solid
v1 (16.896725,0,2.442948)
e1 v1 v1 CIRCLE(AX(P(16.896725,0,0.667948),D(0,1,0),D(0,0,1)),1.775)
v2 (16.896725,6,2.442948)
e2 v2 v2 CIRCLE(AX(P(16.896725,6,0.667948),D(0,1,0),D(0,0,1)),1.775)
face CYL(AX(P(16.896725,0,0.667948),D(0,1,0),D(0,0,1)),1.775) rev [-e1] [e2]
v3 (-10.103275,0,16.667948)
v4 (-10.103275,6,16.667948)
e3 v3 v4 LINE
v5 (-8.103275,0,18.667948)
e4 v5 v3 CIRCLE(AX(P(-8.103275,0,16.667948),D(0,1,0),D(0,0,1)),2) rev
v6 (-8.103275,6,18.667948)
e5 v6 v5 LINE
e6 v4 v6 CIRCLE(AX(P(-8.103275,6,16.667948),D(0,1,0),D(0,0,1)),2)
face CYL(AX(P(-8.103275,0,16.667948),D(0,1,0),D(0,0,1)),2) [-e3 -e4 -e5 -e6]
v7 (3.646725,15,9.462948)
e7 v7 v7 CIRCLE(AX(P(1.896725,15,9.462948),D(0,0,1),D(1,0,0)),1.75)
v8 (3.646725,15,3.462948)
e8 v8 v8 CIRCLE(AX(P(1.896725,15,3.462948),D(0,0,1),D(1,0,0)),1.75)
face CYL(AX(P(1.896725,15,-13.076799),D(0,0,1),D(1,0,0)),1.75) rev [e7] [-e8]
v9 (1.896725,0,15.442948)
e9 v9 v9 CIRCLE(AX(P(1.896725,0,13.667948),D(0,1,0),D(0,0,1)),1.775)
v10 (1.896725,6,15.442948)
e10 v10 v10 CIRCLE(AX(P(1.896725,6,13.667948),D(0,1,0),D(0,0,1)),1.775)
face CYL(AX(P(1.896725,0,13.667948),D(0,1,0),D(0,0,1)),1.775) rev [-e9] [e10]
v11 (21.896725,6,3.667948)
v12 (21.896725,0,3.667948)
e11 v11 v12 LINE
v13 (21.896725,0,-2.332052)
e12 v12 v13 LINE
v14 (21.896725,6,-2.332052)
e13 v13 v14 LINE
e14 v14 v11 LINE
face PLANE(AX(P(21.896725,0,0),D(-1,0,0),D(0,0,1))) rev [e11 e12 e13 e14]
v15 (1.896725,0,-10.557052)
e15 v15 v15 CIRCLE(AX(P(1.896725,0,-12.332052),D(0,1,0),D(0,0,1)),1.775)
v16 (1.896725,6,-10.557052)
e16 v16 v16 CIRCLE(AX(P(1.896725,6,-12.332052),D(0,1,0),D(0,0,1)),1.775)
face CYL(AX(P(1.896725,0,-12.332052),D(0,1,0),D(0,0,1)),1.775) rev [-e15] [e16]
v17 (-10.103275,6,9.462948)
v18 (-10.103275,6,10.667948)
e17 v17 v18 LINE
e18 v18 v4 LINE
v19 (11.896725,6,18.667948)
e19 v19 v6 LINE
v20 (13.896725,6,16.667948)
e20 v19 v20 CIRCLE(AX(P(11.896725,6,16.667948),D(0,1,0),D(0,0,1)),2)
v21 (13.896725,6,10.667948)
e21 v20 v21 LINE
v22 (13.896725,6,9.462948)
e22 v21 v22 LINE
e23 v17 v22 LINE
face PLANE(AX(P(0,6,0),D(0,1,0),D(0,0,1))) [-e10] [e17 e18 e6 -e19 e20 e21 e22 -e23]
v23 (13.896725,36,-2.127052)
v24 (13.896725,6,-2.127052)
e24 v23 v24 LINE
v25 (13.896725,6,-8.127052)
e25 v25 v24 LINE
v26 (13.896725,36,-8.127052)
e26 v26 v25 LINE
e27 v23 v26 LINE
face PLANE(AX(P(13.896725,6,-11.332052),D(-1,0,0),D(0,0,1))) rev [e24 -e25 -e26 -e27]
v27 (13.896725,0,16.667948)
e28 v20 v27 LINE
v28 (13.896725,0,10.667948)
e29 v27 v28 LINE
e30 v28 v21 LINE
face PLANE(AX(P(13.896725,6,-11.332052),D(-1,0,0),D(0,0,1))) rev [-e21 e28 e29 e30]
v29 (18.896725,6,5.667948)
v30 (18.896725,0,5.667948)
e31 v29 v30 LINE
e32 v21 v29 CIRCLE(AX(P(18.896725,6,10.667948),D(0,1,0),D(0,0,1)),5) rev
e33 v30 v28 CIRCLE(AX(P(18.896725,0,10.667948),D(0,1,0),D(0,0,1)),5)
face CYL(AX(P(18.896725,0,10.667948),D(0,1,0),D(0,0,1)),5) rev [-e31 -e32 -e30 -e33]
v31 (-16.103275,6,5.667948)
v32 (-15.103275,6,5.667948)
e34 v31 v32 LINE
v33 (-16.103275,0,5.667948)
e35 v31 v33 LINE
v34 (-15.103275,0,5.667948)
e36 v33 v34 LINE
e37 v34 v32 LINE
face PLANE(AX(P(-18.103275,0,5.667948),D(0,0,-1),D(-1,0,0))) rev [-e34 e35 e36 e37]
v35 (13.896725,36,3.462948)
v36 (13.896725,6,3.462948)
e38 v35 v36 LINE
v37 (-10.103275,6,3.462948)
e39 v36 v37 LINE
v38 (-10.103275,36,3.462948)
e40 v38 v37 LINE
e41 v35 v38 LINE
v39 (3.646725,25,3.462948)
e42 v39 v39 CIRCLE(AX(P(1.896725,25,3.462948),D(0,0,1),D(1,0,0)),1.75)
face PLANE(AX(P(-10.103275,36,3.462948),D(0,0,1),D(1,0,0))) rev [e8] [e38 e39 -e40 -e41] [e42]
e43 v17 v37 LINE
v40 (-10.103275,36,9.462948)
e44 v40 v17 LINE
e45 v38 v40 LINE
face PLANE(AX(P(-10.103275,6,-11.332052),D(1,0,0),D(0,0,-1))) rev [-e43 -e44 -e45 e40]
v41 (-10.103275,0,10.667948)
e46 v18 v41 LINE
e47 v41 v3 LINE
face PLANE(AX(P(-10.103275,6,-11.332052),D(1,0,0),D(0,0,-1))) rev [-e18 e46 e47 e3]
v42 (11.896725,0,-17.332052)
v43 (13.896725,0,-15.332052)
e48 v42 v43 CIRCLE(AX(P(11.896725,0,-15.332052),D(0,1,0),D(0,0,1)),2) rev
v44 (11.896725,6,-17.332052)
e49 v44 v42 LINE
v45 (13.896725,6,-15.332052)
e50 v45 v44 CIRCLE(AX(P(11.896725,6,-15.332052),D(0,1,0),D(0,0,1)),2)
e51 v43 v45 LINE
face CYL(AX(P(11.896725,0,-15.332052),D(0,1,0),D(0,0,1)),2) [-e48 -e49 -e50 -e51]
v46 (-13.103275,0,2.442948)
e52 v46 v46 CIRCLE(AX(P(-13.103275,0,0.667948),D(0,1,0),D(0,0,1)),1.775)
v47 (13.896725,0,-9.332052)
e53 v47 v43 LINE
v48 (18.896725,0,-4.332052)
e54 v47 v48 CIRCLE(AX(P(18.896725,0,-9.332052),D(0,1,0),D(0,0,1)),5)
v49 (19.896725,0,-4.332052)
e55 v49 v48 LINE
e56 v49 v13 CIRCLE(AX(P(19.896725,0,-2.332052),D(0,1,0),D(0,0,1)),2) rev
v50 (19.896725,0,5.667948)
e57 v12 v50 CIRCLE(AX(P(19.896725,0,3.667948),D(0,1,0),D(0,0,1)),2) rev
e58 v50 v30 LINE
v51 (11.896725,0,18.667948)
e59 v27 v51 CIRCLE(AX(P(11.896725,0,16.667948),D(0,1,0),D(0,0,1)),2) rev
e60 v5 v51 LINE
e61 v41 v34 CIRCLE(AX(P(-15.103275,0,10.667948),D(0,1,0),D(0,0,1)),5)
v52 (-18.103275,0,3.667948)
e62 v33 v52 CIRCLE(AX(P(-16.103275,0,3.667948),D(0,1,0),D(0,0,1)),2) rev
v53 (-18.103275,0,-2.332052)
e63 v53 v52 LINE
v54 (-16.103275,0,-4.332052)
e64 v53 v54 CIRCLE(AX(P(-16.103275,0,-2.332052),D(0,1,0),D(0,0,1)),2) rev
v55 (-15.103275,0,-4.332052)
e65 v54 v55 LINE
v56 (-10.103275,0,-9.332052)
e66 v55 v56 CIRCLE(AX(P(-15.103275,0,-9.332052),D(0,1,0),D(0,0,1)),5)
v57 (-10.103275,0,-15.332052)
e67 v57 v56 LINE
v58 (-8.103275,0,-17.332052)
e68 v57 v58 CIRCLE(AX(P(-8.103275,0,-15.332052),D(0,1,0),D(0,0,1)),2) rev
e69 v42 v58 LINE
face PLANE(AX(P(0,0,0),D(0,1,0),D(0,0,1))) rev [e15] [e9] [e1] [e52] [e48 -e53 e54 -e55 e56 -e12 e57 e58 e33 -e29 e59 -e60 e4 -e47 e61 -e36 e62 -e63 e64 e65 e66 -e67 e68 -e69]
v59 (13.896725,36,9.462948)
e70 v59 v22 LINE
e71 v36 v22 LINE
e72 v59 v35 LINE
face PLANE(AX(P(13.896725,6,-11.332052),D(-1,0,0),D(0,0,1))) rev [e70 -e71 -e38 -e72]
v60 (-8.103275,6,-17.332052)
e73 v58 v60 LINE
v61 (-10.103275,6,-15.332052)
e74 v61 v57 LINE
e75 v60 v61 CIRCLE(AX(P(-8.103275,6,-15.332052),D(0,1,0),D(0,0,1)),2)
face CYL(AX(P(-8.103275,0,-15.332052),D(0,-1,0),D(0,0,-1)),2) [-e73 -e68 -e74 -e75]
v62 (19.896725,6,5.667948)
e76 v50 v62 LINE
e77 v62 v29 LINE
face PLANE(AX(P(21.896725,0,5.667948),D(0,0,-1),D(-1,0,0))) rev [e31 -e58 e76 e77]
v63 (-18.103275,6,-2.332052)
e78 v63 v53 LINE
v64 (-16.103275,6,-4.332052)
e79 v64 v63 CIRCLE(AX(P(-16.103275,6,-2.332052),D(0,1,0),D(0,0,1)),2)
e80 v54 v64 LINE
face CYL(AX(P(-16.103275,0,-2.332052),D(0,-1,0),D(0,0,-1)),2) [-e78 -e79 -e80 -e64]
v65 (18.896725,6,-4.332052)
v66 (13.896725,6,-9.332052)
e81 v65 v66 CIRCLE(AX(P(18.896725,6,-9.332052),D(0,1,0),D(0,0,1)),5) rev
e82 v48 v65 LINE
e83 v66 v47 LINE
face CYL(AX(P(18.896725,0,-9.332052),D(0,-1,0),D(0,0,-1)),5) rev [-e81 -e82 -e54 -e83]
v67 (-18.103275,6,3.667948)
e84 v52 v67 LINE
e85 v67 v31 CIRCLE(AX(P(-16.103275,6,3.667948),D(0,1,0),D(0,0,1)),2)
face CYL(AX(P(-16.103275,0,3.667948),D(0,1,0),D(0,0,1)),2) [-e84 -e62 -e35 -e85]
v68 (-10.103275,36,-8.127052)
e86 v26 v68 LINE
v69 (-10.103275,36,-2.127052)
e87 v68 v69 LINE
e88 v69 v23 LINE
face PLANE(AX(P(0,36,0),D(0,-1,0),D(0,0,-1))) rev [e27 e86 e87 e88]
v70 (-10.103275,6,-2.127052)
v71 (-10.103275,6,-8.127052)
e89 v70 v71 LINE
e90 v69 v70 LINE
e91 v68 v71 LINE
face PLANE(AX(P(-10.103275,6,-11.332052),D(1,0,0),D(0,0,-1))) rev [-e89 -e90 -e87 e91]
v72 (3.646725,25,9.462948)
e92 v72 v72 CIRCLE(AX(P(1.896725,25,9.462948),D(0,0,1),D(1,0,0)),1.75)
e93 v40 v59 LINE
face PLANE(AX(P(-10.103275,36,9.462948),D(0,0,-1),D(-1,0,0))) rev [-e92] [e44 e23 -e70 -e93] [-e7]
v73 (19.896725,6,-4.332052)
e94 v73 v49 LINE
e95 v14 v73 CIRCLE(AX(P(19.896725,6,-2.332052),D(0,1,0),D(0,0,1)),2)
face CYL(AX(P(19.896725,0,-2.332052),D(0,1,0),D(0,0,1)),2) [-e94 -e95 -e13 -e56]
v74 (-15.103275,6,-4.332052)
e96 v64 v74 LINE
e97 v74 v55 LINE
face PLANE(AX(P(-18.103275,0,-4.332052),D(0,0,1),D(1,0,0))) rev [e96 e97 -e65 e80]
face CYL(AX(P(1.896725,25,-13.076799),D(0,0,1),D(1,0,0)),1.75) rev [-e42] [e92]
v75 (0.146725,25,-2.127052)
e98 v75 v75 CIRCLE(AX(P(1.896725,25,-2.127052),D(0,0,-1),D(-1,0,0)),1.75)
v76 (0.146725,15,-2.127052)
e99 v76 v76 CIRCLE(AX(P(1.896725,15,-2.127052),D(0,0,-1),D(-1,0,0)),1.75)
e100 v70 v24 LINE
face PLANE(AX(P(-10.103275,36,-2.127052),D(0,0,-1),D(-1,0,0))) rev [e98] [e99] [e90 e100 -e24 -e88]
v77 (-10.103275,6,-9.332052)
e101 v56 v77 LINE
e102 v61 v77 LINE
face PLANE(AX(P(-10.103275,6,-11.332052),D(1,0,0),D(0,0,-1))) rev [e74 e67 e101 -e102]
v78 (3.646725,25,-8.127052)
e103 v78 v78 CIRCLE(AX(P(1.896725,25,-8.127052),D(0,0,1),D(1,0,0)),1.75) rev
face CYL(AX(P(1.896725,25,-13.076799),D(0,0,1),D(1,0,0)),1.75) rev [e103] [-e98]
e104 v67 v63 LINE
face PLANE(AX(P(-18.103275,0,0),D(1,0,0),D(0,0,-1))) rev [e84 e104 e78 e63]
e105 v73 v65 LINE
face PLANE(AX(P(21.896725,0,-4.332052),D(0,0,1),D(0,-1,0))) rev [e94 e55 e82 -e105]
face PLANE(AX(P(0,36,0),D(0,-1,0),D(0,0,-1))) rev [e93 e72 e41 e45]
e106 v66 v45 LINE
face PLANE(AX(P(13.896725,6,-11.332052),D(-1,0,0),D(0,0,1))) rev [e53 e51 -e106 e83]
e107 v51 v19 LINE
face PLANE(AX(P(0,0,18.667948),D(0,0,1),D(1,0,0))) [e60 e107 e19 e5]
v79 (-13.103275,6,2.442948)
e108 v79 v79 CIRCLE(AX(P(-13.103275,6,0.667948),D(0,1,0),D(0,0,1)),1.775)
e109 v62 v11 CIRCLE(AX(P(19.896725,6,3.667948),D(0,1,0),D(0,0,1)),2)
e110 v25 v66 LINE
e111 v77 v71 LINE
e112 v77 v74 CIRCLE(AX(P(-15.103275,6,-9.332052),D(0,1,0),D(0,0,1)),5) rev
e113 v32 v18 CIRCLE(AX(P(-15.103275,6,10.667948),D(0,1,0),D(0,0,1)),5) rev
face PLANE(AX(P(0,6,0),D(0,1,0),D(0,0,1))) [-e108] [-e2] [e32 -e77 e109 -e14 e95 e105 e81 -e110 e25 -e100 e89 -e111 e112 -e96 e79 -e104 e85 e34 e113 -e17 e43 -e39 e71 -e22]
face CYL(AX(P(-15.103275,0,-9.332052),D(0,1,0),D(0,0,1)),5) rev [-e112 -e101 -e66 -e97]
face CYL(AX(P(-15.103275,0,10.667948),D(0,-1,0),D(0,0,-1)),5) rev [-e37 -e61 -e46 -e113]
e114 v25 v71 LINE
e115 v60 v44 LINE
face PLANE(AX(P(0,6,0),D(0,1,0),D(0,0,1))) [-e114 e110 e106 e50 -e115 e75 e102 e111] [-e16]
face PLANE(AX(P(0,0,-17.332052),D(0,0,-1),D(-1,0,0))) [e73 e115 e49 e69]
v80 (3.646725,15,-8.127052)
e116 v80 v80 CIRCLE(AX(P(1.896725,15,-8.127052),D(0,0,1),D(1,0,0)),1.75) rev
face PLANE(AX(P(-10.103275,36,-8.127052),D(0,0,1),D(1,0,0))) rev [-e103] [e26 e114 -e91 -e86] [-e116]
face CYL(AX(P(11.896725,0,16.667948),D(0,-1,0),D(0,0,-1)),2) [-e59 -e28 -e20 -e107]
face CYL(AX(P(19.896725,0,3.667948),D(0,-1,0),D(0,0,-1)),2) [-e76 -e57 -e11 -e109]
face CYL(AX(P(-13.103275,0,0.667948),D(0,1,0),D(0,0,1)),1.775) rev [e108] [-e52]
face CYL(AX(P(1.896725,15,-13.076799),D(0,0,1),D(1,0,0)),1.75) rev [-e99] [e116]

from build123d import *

# Parameters (mm, degrees)
SKETCH1_W           = 24
SKETCH1_H           = 24
BOSS_EXTRUDE1_DEPTH = 6
SKETCH2_W           = 24
SKETCH2_H           = 6
BOSS_EXTRUDE2_DEPTH = 30
SKETCH3_W           = 24
SKETCH3_H           = 6
BOSS_EXTRUDE3_DEPTH = 6
SKETCH4_W           = 24
SKETCH4_H           = 6
BOSS_EXTRUDE4_DEPTH = 6
SKETCH5_W           = 10
SKETCH5_H           = 6
BOSS_EXTRUDE5_DEPTH = 8
FILLET1_R           = 5
FILLET2_R           = 2
FILLET3_R           = 2
SKETCH6_W           = 10
SKETCH6_H           = 6
BOSS_EXTRUDE6_DEPTH = 8
FILLET4_R           = 5
FILLET5_R           = 2
SKETCH7_R           = 1.775
CUT_EXTRUDE1_DEPTH  = 42.568724431
CUT_EXTRUDE2_REACH  = 51.934
SKETCH8_R           = 1.75


with BuildPart() as part:
    # Sketch1 → Boss-Extrude1 (new body)
    with BuildSketch(Plane(origin=(0, 0, 0), x_dir=(1, 0, 0), z_dir=(0, 1, 0))):
        with Locations((1.896724894, -0.667948192)):
            Rectangle(SKETCH1_W, SKETCH1_H)
    extrude(amount=BOSS_EXTRUDE1_DEPTH)

    # Sketch2 → Boss-Extrude2 (add)
    with BuildSketch(Plane(origin=(0, 6, 0), x_dir=(1, 0, 0), z_dir=(0, 1, 0))):
        with Locations((1.896724894, -6.462948192)):
            Rectangle(SKETCH2_W, SKETCH2_H)
        with Locations((1.896724894, 5.127051808)):
            Rectangle(SKETCH2_W, SKETCH2_H)
    extrude(amount=BOSS_EXTRUDE2_DEPTH)

    # Sketch3 → Boss-Extrude3 (add)
    with BuildSketch(Plane.XY.offset(12.667948192)):
        with Locations((1.896724894, 3)):
            Rectangle(SKETCH3_W, SKETCH3_H)
    extrude(amount=BOSS_EXTRUDE3_DEPTH)

    # Sketch4 → Boss-Extrude4 (add)
    with BuildSketch(Plane(origin=(0, 0, -11.332051808), x_dir=(-1, 0, 0), z_dir=(0, 0, -1))):
        with Locations((-1.896724894, 3)):
            Rectangle(SKETCH4_W, SKETCH4_H)
    extrude(amount=BOSS_EXTRUDE4_DEPTH)

    # Sketch5 → Boss-Extrude5 (add)
    with BuildSketch(Plane(origin=(13.896724894, 0, 0), x_dir=(0, 0, -1), z_dir=(1, 0, 0))):
        with Locations((-0.667948192, 3)):
            Rectangle(SKETCH5_W, SKETCH5_H)
    extrude(amount=BOSS_EXTRUDE5_DEPTH)

    # Fillet1
    # the kernel refuses this fillet: 5 mm, written as the material it adds along each edge
    with BuildSketch(Plane(origin=(13.896724894, 0, -4.332051808), x_dir=(0, 0, -1), z_dir=(0, 1, 0)), Plane(origin=(13.896724894, 6, 5.667948192), x_dir=(0, 0, 1), z_dir=(0, -1, 0))) as fillet1_piece_1:
        with BuildLine():
            CenterArc((FILLET1_R, -FILLET1_R), FILLET1_R, 90, 90)
            Line((0, -FILLET1_R), (0, 0))
            Line((0, 0), (FILLET1_R, 0))
        make_face()
    extrude(amount=6)

    # Fillet2
    fillet2_edges = [part.edges().sort_by_distance(p)[0] for p in [
        (21.896724894, 3, -4.332051808),
        (21.896724894, 3, 5.667948192),
    ]]
    fillet(fillet2_edges, radius=FILLET2_R)

    # Fillet3
    fillet3_edges = [part.edges().sort_by_distance(p)[0] for p in [
        (-10.103275106, 3, 18.667948192),
        (13.896724894, 3, 18.667948192),
        (13.896724894, 3, -17.332051808),
        (-10.103275106, 3, -17.332051808),
    ]]
    fillet(fillet3_edges, radius=FILLET3_R)

    # Sketch6 → Boss-Extrude6 (add)
    with BuildSketch(Plane.ZY.offset(10.103275106)):
        with Locations((0.667948192, 3)):
            Rectangle(SKETCH6_W, SKETCH6_H)
    extrude(amount=BOSS_EXTRUDE6_DEPTH)

    # Fillet4
    # the kernel refuses this fillet: 5 mm, written as the material it adds along each edge
    with BuildSketch(Plane(origin=(-10.103275106, 6, -4.332051808), x_dir=(0, 0, -1), z_dir=(0, -1, 0)), Plane(origin=(-10.103275106, 0, 5.667948192), x_dir=(0, 0, 1), z_dir=(0, 1, 0))) as fillet4_piece_1:
        with BuildLine():
            CenterArc((FILLET4_R, -FILLET4_R), FILLET4_R, 90, 90)
            Line((0, -FILLET4_R), (0, 0))
            Line((0, 0), (FILLET4_R, 0))
        make_face()
    extrude(amount=6)

    # Fillet5
    fillet5_edges = [part.edges().sort_by_distance(p)[0] for p in [
        (-18.103275106, 3, -4.332051808),
        (-18.103275106, 3, 5.667948192),
    ]]
    fillet(fillet5_edges, radius=FILLET5_R)

    # Sketch7 → Cut-Extrude1 (cut, through all)
    with BuildSketch(Plane(origin=(0, 6, 0), x_dir=(1, 0, 0), z_dir=(0, 1, 0))):
        with Locations(Location((1.896724894, -13.667948192, 0), (0, 0, 270))):
            Circle(SKETCH7_R)
        with Locations(Location((-13.103275106, -0.667948192, 0), (0, 0, 270))):
            Circle(SKETCH7_R)
        with Locations(Location((1.896724894, 12.332051808, 0), (0, 0, 270))):
            Circle(SKETCH7_R)
        with Locations(Location((16.896724894, -0.667948192, 0), (0, 0, 270))):
            Circle(SKETCH7_R)
    extrude(amount=-CUT_EXTRUDE1_DEPTH, mode=Mode.SUBTRACT)

    # Cut-Extrude2: up to this face of the body (flat: up to its plane)
    cut_extrude2_end = Plane(part.part.faces().sort_by_distance((1.896724894, 21, -8.127051808))[0])
    # Sketch8 → Cut-Extrude2 (cut, up to the picked face)
    with BuildSketch(Plane.XY.offset(9.462948192), mode=Mode.PRIVATE) as cut_extrude2_sk1:
        with Locations((1.896724894, 15)):
            Circle(SKETCH8_R)
    cut_extrude2_tool1 = split(extrude(cut_extrude2_sk1.sketch, amount=-CUT_EXTRUDE2_REACH, mode=Mode.PRIVATE), bisect_by=cut_extrude2_end, keep=Keep.BOTH, mode=Mode.PRIVATE)
    # Sketch8 → Cut-Extrude2 (cut, up to the picked face)
    with BuildSketch(Plane.XY.offset(9.462948192), mode=Mode.PRIVATE) as cut_extrude2_sk2:
        with Locations((1.896724894, 25)):
            Circle(SKETCH8_R)
    cut_extrude2_tool2 = split(extrude(cut_extrude2_sk2.sketch, amount=-CUT_EXTRUDE2_REACH, mode=Mode.PRIVATE), bisect_by=cut_extrude2_end, keep=Keep.BOTH, mode=Mode.PRIVATE)
    add(cut_extrude2_tool1.solids().sort_by(Axis((1.896725, 15, 9.462948), (0, 0, -1)))[0], mode=Mode.SUBTRACT)
    add(cut_extrude2_tool2.solids().sort_by(Axis((1.896725, 25, 9.462948), (0, 0, -1)))[0], mode=Mode.SUBTRACT)


solid = part.part
